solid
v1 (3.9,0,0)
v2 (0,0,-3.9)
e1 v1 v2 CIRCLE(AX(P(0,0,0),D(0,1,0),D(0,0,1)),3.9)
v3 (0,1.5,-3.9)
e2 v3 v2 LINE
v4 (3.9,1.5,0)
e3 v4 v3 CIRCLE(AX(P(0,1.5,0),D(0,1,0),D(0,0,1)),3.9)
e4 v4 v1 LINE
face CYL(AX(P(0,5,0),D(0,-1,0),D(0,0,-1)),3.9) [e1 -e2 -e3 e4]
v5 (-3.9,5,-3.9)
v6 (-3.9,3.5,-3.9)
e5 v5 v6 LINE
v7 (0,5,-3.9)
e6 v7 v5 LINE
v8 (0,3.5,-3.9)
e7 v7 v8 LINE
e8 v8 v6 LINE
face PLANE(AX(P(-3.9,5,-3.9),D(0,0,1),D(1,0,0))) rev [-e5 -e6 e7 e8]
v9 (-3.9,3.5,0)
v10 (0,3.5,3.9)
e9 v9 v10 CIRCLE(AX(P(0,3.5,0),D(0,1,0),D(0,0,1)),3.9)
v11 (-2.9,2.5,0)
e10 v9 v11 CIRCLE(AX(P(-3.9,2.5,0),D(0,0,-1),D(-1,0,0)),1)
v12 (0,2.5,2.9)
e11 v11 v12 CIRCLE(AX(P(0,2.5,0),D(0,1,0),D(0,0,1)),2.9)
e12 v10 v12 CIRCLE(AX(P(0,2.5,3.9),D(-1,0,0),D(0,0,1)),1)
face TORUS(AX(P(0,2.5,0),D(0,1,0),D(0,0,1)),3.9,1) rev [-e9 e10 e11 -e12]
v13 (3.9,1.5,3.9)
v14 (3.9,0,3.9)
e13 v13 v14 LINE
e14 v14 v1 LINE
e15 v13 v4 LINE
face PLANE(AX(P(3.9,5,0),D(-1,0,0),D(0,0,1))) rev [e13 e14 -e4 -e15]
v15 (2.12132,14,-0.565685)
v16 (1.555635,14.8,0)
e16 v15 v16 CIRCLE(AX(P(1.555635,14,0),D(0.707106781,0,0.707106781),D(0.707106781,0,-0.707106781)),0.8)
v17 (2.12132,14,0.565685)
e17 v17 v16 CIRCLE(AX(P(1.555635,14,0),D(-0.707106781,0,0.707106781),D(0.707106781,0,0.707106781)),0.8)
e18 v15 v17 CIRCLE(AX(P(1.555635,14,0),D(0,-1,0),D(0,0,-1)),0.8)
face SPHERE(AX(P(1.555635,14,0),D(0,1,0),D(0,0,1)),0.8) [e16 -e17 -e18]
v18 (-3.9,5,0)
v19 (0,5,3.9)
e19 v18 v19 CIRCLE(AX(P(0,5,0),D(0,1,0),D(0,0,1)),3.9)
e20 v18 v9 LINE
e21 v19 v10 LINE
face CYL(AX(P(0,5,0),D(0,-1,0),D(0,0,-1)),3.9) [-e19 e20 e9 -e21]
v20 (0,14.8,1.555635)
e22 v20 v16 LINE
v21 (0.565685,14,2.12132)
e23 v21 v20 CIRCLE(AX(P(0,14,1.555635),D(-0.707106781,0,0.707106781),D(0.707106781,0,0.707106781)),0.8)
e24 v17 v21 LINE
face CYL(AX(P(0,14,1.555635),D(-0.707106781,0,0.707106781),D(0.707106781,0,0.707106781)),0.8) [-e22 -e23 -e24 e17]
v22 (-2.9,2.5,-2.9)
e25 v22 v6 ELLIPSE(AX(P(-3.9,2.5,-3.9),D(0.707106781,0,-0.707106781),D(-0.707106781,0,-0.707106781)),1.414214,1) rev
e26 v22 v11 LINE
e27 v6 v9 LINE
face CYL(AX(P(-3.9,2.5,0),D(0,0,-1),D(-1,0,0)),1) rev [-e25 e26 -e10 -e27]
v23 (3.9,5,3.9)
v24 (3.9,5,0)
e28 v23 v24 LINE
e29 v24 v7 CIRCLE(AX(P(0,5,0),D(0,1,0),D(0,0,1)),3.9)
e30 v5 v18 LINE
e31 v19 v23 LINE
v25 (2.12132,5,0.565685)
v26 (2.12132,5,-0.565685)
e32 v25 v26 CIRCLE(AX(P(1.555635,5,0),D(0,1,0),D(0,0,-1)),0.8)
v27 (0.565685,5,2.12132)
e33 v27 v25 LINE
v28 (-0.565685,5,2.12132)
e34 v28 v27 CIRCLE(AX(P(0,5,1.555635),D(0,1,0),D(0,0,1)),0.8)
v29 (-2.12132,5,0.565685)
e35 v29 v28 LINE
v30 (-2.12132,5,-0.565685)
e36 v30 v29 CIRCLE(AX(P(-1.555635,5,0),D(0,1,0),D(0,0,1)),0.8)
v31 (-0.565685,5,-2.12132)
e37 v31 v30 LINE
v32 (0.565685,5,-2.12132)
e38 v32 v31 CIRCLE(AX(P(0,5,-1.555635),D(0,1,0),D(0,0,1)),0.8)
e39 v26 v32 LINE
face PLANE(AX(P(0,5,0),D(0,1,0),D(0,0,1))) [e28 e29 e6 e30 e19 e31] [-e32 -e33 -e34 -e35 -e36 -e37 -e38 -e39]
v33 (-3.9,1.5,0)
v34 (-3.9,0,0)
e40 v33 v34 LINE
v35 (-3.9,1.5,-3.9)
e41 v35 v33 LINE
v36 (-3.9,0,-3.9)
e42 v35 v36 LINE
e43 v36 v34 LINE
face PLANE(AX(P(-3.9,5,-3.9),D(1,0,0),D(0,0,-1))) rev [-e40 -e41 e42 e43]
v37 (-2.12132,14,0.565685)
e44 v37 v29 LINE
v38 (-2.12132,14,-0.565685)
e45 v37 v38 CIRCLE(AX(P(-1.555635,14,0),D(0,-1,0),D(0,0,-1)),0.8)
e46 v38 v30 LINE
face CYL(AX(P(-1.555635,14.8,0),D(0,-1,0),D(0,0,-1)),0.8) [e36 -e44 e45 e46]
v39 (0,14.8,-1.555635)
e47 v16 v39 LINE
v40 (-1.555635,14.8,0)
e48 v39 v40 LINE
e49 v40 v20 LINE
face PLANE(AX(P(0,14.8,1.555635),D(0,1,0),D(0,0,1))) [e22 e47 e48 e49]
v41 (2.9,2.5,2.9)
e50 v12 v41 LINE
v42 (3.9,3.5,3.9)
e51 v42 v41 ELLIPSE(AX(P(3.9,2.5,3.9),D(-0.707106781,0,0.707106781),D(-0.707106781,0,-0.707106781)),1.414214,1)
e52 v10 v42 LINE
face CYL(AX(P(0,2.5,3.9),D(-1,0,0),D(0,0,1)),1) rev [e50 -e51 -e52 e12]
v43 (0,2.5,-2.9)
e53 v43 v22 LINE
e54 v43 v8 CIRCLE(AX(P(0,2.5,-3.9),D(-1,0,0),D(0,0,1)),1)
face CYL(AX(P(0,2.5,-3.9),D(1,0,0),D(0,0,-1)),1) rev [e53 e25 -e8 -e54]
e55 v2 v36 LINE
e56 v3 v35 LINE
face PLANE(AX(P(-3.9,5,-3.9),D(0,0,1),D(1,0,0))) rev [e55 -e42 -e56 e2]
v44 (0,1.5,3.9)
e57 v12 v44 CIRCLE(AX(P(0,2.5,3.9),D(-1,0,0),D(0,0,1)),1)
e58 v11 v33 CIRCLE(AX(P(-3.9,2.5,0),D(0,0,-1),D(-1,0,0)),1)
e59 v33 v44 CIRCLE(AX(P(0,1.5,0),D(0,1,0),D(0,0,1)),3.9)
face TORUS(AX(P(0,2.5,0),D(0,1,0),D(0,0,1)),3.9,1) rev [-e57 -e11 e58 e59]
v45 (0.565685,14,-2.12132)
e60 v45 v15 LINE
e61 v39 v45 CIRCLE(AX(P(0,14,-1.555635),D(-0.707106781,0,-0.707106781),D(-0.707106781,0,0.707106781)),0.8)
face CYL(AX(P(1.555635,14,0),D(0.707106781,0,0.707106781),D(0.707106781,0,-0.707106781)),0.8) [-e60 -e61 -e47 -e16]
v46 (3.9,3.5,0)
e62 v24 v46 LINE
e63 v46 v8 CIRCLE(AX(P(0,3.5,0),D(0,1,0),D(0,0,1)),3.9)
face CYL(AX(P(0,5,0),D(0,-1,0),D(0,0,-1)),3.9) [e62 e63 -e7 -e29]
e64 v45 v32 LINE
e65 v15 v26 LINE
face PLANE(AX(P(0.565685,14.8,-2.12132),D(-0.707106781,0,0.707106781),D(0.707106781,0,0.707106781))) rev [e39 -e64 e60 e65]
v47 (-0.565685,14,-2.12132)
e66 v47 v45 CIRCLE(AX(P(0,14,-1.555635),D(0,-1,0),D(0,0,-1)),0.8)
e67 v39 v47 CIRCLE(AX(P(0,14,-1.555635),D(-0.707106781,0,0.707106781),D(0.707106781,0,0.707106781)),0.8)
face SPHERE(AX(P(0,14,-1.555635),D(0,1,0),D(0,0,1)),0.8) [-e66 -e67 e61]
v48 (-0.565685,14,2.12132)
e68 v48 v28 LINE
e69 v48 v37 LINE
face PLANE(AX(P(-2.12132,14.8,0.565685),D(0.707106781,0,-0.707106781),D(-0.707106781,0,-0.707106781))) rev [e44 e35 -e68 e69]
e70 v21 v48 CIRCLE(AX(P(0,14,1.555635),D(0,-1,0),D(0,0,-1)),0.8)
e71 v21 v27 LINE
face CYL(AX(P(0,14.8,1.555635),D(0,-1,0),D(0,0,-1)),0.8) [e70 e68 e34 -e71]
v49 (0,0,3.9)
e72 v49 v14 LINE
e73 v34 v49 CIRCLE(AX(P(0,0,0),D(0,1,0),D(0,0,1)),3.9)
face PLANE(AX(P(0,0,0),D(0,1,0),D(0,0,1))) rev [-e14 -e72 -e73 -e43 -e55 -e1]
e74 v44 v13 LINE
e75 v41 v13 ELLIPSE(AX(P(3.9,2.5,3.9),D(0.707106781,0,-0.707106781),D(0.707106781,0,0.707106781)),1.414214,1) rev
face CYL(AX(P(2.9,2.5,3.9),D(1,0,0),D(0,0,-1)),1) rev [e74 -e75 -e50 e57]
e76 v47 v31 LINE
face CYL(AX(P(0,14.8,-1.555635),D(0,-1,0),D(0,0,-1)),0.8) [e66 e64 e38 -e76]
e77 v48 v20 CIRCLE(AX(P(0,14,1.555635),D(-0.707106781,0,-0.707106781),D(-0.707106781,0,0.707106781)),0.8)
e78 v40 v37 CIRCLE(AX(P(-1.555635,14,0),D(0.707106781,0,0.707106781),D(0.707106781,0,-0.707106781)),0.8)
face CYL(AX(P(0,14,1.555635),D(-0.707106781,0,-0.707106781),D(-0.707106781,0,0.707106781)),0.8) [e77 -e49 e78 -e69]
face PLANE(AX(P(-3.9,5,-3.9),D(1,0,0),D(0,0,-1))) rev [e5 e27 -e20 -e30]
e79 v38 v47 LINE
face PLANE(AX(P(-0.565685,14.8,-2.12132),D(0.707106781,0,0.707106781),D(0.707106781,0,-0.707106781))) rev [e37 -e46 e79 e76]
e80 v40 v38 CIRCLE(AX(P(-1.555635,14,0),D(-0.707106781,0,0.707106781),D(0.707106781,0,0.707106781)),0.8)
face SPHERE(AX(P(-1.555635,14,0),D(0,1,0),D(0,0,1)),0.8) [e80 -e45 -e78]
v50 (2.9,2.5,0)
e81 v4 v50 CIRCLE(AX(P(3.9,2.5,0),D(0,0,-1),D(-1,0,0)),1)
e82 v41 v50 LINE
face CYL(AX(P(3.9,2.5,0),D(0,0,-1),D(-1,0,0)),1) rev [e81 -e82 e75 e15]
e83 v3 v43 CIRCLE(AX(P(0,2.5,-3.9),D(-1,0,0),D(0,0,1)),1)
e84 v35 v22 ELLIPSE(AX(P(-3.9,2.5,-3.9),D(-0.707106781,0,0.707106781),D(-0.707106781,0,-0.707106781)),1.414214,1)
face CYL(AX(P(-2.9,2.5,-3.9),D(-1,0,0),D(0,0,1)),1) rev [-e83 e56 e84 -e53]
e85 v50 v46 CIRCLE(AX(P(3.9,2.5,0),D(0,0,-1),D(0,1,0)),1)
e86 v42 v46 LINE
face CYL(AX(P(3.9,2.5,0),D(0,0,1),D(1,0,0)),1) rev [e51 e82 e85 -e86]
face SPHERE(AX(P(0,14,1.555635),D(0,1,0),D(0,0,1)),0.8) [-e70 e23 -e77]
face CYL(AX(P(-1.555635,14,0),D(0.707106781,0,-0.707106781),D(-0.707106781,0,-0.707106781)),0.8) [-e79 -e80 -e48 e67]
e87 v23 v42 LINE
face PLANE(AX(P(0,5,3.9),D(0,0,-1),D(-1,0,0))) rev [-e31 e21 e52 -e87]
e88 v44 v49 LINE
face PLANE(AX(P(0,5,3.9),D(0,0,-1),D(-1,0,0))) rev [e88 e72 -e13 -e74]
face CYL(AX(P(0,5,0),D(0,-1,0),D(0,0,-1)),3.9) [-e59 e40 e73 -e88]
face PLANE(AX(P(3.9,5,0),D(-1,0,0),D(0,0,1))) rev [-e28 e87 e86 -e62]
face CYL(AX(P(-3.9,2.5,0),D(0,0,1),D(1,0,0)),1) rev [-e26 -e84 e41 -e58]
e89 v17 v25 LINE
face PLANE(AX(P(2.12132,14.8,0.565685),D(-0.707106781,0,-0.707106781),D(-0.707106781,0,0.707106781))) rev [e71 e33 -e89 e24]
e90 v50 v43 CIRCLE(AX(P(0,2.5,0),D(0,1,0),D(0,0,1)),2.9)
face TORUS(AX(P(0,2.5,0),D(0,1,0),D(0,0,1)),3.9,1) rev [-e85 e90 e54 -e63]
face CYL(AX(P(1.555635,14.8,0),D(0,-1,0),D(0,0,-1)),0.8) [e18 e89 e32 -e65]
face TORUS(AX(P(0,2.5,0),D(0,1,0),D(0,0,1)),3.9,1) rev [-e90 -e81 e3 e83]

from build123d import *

# Parameters (mm, degrees)
BOSS_EXTRUDE1_DEPTH     = 5
BOSS_EXTRUDE2_DEPTH     = 9.8
CUT_EXTRUDE2_DEPTH      = 1
CUT_EXTRUDE2_DEPTH_BACK = 1
FILLET1_R               = 1
FILLET3_R               = 0.8


with BuildPart() as part:
    # Sketch1 → Boss-Extrude1 (new body)
    with BuildSketch(Plane(origin=(0, 0, 0), x_dir=(1, 0, 0), z_dir=(0, 1, 0))):
        with BuildLine():
            Line((-3.9, 3.9), (0, 3.9))
            ThreePointArc((0, 3.9), (2.757716447, 2.757716447), (3.9, 0))
            Line((3.9, 0), (3.9, -3.9))
            Line((3.9, -3.9), (0, -3.9))
            ThreePointArc((0, -3.9), (-2.757716447, -2.757716447), (-3.9, 0))
            Line((-3.9, 0), (-3.9, 3.9))
        make_face()
    extrude(amount=BOSS_EXTRUDE1_DEPTH)

    # Sketch2 → Boss-Extrude2 (add)
    with BuildSketch(Plane(origin=(0, 5, 0), x_dir=(1, 0, 0), z_dir=(0, 1, 0))):
        with BuildLine():
            Line((-0.565685425, 2.121320344), (-2.121320344, 0.565685425))
            ThreePointArc((-2.121320344, 0.565685425), (-2.355634919, 0), (-2.121320344, -0.565685425))
            Line((-2.121320344, -0.565685425), (-0.565685425, -2.121320344))
            ThreePointArc((-0.565685425, -2.121320344), (0, -2.355634919), (0.565685425, -2.121320344))
            Line((0.565685425, -2.121320344), (2.121320344, -0.565685425))
            ThreePointArc((2.121320344, -0.565685425), (2.355634919, 0), (2.121320344, 0.565685425))
            Line((2.121320344, 0.565685425), (0.565685425, 2.121320344))
            ThreePointArc((0.565685425, 2.121320344), (0, 2.355634919), (-0.565685425, 2.121320344))
        make_face()
    extrude(amount=BOSS_EXTRUDE2_DEPTH)

    # Sketch3 → Cut-Extrude2 (cut, two sides: drawn at the far end of the back side and taken through both)
    with BuildSketch(Plane(origin=(0, 2.5, 0), x_dir=(1, 0, 0), z_dir=(0, 1, 0)).offset(-CUT_EXTRUDE2_DEPTH_BACK)):
        with BuildLine():
            Line((-3.9, 0), (-3.9, 3.9))
            Line((-3.9, 3.9), (0, 3.9))
            ThreePointArc((0, 3.9), (2.757716447, 2.757716447), (3.9, 0))
            Line((3.9, 0), (3.9, -3.9))
            Line((3.9, -3.9), (0, -3.9))
            ThreePointArc((0, -3.9), (-2.757716447, -2.757716447), (-3.9, 0))
        make_face()
        with BuildLine():
            Line((-2.9, 0), (-2.9, 2.9))
            Line((-2.9, 2.9), (0, 2.9))
            ThreePointArc((0, 2.9), (2.050609665, 2.050609665), (2.9, 0))
            Line((2.9, 0), (2.9, -2.9))
            Line((2.9, -2.9), (0, -2.9))
            ThreePointArc((0, -2.9), (-2.050609665, -2.050609665), (-2.9, 0))
        make_face(mode=Mode.SUBTRACT)
    extrude(amount=CUT_EXTRUDE2_DEPTH + CUT_EXTRUDE2_DEPTH_BACK, mode=Mode.SUBTRACT)

    # Fillet1
    fillet1_edges = [part.edges().sort_by_distance(p)[0] for p in [
        (2.9, 3.5, 1.45),
        (2.050609665, 3.5, -2.050609665),
        (1.45, 3.5, 2.9),
        (-2.050609665, 3.5, 2.050609665),
        (2.9, 1.5, 1.45),
        (2.050609665, 1.5, -2.050609665),
        (-2.9, 1.5, -1.45),
        (1.45, 1.5, 2.9),
        (-1.45, 3.5, -2.9),
        (-2.9, 3.5, -1.45),
        (-1.45, 1.5, -2.9),
        (-2.050609665, 1.5, 2.050609665),
    ]]
    fillet(fillet1_edges, radius=FILLET1_R - 0.0001)  # a hair under: the kernel refuses the full size

    # Fillet3
    fillet3_edges = [part.edges().sort_by_distance(p)[0] for p in [
        (0, 14.8, 2.355634919),
        (1.343502884, 14.8, 1.343502884),
        (2.355634919, 14.8, 0),
        (1.343502884, 14.8, -1.343502884),
        (0, 14.8, -2.355634919),
        (-1.343502884, 14.8, -1.343502884),
        (-2.355634919, 14.8, 0),
        (-1.343502884, 14.8, 1.343502884),
    ]]
    fillet(fillet3_edges, radius=FILLET3_R)


solid = part.part
